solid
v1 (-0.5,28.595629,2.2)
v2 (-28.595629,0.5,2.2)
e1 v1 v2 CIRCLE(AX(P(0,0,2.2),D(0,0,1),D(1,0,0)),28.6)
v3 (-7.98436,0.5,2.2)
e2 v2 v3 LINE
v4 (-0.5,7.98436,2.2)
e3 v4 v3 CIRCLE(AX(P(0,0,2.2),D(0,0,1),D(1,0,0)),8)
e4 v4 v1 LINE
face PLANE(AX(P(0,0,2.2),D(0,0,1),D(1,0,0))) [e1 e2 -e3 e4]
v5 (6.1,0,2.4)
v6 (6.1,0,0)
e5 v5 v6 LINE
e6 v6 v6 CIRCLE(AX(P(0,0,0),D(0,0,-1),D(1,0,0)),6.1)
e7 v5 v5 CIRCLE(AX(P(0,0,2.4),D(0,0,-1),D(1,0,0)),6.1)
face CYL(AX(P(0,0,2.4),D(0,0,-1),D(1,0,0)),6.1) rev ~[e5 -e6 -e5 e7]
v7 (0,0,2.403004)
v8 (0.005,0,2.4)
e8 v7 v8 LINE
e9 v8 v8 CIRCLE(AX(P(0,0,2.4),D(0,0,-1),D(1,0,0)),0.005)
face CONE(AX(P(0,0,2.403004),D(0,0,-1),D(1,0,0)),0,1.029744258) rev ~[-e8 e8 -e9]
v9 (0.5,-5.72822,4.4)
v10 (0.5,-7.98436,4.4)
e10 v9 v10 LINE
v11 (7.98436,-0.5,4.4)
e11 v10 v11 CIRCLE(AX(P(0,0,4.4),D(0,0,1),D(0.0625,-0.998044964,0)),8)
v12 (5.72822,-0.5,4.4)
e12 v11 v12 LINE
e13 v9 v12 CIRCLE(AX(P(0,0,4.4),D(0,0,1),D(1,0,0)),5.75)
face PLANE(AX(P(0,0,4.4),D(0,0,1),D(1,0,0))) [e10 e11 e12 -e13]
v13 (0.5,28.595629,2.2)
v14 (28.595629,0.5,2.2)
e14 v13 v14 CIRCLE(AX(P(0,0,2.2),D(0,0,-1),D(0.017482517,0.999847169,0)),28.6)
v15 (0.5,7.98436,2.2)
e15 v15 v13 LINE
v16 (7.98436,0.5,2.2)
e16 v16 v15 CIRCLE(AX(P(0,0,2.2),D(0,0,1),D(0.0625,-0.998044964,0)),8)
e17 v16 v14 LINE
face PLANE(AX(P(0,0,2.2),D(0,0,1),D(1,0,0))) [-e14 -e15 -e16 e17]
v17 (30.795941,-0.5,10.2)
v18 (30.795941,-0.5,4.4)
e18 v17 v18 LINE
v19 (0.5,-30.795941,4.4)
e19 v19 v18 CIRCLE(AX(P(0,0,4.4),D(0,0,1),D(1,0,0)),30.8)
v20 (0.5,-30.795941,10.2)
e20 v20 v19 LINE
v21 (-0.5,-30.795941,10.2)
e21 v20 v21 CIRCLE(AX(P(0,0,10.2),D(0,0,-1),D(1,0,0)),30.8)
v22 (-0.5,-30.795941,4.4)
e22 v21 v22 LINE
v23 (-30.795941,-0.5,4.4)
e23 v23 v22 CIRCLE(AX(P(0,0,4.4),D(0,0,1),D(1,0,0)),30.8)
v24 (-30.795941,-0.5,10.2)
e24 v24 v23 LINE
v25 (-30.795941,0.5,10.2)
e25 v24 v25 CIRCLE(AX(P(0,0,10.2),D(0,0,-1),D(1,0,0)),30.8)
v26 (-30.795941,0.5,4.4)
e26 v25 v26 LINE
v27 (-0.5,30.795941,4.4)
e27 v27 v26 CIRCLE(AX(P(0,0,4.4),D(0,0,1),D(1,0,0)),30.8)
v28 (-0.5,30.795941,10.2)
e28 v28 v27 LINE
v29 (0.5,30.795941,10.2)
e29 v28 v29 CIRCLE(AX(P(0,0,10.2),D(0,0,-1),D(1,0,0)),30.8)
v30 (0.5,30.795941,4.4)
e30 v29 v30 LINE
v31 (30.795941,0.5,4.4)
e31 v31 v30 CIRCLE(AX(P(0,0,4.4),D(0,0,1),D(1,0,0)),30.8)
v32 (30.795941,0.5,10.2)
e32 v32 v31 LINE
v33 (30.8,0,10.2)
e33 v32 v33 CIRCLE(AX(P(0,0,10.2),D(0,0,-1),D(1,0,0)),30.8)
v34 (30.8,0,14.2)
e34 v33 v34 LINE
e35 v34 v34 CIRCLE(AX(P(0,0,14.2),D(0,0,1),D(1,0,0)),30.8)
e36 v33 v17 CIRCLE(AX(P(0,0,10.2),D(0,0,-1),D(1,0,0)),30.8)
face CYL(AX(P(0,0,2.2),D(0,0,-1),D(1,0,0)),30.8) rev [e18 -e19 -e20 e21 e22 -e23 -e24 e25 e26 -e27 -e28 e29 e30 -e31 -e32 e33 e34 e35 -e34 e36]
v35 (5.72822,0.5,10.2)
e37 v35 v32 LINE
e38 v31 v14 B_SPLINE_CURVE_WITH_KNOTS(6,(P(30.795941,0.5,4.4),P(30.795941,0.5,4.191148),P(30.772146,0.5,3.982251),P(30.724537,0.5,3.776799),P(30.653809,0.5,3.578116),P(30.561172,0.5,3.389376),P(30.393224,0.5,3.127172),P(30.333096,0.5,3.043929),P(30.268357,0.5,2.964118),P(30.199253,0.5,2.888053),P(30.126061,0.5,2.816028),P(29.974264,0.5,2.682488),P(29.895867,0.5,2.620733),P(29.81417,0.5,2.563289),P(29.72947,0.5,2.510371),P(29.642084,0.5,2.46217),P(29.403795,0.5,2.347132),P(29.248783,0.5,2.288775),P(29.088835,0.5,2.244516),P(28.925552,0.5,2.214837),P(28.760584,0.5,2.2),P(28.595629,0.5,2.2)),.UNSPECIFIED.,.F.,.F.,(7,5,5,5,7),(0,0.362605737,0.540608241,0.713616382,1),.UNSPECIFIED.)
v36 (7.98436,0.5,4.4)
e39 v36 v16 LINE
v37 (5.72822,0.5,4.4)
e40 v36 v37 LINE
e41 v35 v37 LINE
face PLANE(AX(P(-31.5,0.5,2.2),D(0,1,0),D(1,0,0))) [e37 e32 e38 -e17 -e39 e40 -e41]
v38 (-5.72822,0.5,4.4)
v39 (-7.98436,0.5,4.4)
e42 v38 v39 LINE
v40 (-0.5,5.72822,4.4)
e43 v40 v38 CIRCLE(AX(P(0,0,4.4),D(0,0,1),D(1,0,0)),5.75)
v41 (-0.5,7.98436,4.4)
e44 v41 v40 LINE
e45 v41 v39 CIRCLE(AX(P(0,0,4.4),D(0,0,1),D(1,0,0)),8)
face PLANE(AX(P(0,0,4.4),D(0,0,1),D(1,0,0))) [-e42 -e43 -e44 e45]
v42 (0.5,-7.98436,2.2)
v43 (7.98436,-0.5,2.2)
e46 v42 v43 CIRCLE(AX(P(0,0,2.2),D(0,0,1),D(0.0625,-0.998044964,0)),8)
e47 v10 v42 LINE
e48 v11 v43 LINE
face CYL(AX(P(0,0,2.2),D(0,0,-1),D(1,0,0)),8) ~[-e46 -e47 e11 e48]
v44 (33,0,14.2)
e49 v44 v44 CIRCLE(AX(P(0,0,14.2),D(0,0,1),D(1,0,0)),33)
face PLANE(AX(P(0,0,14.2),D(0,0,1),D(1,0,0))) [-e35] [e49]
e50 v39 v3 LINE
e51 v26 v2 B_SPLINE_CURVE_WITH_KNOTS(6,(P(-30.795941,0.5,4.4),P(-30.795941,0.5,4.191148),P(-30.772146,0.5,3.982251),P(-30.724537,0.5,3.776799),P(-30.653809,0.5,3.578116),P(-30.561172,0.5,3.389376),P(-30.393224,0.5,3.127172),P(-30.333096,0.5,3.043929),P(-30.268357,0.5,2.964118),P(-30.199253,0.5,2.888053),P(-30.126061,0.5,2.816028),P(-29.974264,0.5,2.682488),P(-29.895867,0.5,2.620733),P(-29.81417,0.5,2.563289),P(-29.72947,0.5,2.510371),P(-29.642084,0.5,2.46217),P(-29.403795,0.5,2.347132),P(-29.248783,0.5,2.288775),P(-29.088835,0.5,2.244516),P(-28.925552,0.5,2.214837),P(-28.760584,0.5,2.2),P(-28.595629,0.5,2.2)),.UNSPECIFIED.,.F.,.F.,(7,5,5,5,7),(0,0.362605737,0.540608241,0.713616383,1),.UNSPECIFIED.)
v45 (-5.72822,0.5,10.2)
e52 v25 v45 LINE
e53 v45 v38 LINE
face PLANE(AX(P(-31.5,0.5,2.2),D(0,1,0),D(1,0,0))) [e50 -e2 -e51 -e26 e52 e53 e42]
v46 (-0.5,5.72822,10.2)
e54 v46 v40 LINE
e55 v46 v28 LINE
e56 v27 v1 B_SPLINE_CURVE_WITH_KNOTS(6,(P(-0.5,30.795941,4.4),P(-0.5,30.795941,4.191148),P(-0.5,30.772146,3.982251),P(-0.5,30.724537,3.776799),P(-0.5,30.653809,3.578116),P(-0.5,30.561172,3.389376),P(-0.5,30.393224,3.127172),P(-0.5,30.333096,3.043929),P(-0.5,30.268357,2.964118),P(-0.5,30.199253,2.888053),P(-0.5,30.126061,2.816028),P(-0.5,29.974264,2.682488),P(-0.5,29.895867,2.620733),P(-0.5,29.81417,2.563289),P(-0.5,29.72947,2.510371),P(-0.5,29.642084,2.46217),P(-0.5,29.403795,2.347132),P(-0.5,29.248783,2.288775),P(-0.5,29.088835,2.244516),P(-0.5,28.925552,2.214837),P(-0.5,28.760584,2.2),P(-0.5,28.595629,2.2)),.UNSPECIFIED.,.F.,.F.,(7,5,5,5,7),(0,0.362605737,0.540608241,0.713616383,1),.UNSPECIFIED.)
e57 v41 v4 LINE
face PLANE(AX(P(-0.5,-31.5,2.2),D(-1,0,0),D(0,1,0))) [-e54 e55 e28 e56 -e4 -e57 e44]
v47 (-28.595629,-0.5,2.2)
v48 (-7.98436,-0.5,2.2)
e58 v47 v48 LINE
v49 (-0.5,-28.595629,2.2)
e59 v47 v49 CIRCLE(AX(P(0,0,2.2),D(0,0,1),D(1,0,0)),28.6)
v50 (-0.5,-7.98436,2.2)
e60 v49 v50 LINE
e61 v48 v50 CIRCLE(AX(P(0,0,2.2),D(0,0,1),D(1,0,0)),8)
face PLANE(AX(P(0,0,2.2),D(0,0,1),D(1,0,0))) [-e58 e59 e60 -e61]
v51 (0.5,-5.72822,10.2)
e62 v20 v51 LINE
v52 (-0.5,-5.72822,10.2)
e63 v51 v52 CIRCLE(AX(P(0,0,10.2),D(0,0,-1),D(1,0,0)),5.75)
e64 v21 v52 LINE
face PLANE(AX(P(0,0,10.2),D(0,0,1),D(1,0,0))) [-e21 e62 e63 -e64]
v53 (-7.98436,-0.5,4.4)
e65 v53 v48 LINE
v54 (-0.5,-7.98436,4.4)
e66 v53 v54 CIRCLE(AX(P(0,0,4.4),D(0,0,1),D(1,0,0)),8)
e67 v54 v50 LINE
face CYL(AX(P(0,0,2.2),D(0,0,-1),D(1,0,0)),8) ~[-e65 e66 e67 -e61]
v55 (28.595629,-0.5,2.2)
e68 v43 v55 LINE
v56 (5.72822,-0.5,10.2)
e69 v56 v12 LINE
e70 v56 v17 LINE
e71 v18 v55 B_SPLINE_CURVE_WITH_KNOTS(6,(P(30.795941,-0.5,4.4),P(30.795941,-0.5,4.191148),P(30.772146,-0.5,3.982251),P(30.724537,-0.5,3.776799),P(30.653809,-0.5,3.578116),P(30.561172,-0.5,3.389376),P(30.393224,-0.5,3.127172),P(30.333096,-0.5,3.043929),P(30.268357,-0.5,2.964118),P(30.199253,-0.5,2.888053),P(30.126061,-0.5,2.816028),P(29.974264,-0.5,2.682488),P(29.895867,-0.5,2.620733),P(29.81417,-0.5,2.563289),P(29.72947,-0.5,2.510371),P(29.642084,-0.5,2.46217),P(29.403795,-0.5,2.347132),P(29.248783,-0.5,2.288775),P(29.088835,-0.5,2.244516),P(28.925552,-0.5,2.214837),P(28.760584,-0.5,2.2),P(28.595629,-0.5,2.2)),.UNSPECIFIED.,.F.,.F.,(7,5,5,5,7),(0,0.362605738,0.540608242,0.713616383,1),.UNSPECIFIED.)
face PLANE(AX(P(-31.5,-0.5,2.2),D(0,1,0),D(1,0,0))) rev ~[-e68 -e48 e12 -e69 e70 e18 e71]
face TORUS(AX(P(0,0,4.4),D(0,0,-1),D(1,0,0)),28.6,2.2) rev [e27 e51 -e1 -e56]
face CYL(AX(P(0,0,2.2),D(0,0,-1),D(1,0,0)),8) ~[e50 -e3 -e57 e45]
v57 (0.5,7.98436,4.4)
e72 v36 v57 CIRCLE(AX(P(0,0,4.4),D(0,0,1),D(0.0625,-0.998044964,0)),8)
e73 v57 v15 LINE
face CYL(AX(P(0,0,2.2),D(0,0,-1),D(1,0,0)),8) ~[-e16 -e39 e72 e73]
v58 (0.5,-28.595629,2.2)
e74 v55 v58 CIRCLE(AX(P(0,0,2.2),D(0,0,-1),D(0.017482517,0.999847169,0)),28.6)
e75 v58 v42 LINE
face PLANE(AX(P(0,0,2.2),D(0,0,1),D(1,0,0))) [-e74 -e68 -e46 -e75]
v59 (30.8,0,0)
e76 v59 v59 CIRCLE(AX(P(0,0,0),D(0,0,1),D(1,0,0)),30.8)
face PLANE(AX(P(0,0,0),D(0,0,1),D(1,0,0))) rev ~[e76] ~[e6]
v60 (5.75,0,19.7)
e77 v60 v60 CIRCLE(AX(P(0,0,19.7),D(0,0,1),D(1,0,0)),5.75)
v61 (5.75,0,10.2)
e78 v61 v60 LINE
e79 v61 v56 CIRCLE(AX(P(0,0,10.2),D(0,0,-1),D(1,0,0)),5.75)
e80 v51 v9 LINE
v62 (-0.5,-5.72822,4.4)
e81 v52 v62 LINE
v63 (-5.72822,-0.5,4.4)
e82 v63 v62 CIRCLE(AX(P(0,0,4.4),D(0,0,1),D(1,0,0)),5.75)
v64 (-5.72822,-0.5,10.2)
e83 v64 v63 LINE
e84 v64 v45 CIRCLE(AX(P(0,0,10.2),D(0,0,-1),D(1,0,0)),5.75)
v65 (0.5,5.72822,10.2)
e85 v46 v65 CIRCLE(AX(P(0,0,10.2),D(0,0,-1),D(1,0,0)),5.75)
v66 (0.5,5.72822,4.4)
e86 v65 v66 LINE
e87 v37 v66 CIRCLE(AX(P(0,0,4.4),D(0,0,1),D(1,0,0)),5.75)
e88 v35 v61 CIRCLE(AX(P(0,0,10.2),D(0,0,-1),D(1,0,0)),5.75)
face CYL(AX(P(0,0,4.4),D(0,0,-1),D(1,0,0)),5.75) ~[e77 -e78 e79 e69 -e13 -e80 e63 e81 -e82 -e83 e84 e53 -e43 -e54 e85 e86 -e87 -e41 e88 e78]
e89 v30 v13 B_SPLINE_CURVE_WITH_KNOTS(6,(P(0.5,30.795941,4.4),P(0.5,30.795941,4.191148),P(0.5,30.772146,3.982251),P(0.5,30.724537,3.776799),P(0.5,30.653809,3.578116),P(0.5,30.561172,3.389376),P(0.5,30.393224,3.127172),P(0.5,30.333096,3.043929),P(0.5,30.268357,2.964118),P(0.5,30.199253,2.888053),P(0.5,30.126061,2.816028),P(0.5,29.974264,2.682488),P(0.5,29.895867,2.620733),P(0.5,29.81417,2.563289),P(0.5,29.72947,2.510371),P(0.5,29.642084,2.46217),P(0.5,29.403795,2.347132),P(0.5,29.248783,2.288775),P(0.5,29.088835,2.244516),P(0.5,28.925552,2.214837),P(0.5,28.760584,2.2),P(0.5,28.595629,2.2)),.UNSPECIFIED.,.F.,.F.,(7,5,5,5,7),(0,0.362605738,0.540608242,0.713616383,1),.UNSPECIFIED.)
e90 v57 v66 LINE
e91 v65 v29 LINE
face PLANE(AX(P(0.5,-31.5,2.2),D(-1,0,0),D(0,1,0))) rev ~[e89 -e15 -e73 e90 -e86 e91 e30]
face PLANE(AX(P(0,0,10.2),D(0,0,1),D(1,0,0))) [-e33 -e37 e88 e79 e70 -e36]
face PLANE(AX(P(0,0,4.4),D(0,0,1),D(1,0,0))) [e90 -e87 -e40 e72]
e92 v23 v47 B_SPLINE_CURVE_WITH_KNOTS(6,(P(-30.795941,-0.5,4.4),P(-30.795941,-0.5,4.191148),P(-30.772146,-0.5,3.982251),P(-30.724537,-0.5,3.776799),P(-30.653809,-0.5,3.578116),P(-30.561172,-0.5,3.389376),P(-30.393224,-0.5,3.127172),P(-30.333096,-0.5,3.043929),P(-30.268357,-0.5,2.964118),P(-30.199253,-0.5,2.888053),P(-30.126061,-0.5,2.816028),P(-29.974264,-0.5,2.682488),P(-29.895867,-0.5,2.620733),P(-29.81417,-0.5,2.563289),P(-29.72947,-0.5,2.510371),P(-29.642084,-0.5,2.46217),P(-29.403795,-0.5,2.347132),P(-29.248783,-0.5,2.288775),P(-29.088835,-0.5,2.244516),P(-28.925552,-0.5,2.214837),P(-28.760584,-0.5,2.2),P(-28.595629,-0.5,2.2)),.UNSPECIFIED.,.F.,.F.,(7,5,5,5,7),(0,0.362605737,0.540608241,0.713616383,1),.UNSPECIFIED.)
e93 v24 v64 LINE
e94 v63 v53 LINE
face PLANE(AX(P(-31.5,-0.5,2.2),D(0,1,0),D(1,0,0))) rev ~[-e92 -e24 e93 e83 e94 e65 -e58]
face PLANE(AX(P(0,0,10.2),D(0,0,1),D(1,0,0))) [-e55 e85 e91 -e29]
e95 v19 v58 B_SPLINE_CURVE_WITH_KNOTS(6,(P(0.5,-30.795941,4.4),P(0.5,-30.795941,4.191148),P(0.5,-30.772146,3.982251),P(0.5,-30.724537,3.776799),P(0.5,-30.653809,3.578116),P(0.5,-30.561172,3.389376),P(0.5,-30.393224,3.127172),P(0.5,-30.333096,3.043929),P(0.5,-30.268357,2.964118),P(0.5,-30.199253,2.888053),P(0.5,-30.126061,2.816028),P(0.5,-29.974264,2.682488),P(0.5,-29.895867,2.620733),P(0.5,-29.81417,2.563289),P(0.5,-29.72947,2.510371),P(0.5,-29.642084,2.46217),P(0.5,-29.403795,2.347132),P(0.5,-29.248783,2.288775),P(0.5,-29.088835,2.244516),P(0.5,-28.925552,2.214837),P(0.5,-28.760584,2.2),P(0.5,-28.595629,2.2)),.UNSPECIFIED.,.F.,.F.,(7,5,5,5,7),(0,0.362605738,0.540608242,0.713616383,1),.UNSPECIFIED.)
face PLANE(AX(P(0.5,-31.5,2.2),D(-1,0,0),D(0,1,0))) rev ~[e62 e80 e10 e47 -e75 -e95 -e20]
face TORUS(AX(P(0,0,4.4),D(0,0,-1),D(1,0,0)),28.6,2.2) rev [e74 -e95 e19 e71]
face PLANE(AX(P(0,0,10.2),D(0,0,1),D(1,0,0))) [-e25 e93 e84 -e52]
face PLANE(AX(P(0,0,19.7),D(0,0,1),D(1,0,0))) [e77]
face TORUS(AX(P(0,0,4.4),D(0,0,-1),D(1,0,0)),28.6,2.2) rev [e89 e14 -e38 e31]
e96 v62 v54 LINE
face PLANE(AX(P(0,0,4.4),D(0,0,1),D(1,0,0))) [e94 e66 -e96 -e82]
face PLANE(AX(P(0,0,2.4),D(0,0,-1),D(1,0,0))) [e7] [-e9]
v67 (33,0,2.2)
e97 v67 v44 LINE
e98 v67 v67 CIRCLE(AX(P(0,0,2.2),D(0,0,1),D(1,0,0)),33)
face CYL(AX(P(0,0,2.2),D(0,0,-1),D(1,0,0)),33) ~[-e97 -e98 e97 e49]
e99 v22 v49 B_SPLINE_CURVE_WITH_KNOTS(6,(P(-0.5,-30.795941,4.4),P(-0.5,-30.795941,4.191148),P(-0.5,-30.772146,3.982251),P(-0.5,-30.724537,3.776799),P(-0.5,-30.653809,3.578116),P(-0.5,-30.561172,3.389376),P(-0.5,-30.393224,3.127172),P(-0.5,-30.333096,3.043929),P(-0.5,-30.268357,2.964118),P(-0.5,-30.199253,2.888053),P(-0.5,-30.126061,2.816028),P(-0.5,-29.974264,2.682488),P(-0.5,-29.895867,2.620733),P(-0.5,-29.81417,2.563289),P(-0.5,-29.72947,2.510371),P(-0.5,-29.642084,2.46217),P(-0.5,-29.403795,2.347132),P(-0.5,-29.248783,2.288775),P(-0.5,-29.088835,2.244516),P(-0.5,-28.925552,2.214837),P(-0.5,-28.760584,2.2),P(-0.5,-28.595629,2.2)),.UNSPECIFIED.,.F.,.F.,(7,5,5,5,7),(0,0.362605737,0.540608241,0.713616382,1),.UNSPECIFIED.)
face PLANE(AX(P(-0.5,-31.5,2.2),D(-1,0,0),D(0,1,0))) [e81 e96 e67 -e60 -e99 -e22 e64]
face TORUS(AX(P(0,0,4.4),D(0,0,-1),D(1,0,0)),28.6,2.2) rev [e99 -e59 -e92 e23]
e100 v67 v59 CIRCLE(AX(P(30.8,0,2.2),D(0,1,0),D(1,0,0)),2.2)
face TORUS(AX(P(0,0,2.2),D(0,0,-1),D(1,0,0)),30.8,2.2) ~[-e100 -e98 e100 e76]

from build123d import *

# Parameters (mm, degrees)
F0_R            = 33
F1_DEPTH        = 2.2
F2_R            = 33
F2_R_2          = 30.8
F3_DEPTH        = 12
F4_R            = 2.2
F5_R            = 2.2
F6_R            = 8
F7_DEPTH        = 2.2
F8_R            = 5.75
F9_DEPTH        = 15.3
F10_W           = 1
F10_H           = 63
F11_DEPTH       = 8
F12_W           = 63
F12_H           = 1
F13_DEPTH       = 8
F15_D           = 0.01
F15_DEPTH       = 2.4
F15_CBORE_D     = 12.2
F15_CBORE_DEPTH = 2.4
F15_TIP         = 0.0030043031


with BuildPart() as f1:
    # F0 (on Top) → F1 (new body)
    with BuildSketch(Plane.XY):
        Circle(F0_R)
    extrude(amount=F1_DEPTH)

    # F2 (on face) → F3 (join)
    with BuildSketch(Plane.XY.offset(2.2)):
        Circle(F2_R)
        Circle(F2_R_2, mode=Mode.SUBTRACT)
    extrude(amount=F3_DEPTH)

    # F4
    f4_edges = [f1.edges().sort_by_distance(p)[0] for p in [
        (-33, 0, 0),
    ]]
    fillet(f4_edges, radius=F4_R)

    # F5
    f5_edges = [f1.edges().sort_by_distance(p)[0] for p in [
        (-30.8, 0, 2.2),
    ]]
    fillet(f5_edges, radius=F5_R)

    # F6 (on face) → F7 (join)
    with BuildSketch(Plane.XY.offset(2.2)):
        Circle(F6_R)
    extrude(amount=F7_DEPTH)

    # F8 (on face) → F9 (join)
    with BuildSketch(Plane.XY.offset(4.4)):
        Circle(F8_R)
    extrude(amount=F9_DEPTH)

    # F10 (on face) → F11 (join)
    with BuildSketch(Plane.XY.offset(2.2)):
        Rectangle(F10_W, F10_H)
    extrude(amount=F11_DEPTH)

    # F12 (on face) → F13 (join)
    with BuildSketch(Plane.XY.offset(2.2)):
        Rectangle(F12_W, F12_H)
    extrude(amount=F13_DEPTH)

    # F15
    with Locations(Plane(origin=(0, 0, 0), x_dir=(1, 0, 0), z_dir=(0, 0, -1))):
        with Locations((0, 0)):
            CounterBoreHole(F15_D / 2, F15_CBORE_D / 2, F15_CBORE_DEPTH, depth=F15_DEPTH)
            with Locations((0, 0, -(F15_DEPTH + F15_TIP / 2))):  # 118° drill point
                Cone(0, F15_D / 2, F15_TIP, mode=Mode.SUBTRACT)


solid = f1.part
